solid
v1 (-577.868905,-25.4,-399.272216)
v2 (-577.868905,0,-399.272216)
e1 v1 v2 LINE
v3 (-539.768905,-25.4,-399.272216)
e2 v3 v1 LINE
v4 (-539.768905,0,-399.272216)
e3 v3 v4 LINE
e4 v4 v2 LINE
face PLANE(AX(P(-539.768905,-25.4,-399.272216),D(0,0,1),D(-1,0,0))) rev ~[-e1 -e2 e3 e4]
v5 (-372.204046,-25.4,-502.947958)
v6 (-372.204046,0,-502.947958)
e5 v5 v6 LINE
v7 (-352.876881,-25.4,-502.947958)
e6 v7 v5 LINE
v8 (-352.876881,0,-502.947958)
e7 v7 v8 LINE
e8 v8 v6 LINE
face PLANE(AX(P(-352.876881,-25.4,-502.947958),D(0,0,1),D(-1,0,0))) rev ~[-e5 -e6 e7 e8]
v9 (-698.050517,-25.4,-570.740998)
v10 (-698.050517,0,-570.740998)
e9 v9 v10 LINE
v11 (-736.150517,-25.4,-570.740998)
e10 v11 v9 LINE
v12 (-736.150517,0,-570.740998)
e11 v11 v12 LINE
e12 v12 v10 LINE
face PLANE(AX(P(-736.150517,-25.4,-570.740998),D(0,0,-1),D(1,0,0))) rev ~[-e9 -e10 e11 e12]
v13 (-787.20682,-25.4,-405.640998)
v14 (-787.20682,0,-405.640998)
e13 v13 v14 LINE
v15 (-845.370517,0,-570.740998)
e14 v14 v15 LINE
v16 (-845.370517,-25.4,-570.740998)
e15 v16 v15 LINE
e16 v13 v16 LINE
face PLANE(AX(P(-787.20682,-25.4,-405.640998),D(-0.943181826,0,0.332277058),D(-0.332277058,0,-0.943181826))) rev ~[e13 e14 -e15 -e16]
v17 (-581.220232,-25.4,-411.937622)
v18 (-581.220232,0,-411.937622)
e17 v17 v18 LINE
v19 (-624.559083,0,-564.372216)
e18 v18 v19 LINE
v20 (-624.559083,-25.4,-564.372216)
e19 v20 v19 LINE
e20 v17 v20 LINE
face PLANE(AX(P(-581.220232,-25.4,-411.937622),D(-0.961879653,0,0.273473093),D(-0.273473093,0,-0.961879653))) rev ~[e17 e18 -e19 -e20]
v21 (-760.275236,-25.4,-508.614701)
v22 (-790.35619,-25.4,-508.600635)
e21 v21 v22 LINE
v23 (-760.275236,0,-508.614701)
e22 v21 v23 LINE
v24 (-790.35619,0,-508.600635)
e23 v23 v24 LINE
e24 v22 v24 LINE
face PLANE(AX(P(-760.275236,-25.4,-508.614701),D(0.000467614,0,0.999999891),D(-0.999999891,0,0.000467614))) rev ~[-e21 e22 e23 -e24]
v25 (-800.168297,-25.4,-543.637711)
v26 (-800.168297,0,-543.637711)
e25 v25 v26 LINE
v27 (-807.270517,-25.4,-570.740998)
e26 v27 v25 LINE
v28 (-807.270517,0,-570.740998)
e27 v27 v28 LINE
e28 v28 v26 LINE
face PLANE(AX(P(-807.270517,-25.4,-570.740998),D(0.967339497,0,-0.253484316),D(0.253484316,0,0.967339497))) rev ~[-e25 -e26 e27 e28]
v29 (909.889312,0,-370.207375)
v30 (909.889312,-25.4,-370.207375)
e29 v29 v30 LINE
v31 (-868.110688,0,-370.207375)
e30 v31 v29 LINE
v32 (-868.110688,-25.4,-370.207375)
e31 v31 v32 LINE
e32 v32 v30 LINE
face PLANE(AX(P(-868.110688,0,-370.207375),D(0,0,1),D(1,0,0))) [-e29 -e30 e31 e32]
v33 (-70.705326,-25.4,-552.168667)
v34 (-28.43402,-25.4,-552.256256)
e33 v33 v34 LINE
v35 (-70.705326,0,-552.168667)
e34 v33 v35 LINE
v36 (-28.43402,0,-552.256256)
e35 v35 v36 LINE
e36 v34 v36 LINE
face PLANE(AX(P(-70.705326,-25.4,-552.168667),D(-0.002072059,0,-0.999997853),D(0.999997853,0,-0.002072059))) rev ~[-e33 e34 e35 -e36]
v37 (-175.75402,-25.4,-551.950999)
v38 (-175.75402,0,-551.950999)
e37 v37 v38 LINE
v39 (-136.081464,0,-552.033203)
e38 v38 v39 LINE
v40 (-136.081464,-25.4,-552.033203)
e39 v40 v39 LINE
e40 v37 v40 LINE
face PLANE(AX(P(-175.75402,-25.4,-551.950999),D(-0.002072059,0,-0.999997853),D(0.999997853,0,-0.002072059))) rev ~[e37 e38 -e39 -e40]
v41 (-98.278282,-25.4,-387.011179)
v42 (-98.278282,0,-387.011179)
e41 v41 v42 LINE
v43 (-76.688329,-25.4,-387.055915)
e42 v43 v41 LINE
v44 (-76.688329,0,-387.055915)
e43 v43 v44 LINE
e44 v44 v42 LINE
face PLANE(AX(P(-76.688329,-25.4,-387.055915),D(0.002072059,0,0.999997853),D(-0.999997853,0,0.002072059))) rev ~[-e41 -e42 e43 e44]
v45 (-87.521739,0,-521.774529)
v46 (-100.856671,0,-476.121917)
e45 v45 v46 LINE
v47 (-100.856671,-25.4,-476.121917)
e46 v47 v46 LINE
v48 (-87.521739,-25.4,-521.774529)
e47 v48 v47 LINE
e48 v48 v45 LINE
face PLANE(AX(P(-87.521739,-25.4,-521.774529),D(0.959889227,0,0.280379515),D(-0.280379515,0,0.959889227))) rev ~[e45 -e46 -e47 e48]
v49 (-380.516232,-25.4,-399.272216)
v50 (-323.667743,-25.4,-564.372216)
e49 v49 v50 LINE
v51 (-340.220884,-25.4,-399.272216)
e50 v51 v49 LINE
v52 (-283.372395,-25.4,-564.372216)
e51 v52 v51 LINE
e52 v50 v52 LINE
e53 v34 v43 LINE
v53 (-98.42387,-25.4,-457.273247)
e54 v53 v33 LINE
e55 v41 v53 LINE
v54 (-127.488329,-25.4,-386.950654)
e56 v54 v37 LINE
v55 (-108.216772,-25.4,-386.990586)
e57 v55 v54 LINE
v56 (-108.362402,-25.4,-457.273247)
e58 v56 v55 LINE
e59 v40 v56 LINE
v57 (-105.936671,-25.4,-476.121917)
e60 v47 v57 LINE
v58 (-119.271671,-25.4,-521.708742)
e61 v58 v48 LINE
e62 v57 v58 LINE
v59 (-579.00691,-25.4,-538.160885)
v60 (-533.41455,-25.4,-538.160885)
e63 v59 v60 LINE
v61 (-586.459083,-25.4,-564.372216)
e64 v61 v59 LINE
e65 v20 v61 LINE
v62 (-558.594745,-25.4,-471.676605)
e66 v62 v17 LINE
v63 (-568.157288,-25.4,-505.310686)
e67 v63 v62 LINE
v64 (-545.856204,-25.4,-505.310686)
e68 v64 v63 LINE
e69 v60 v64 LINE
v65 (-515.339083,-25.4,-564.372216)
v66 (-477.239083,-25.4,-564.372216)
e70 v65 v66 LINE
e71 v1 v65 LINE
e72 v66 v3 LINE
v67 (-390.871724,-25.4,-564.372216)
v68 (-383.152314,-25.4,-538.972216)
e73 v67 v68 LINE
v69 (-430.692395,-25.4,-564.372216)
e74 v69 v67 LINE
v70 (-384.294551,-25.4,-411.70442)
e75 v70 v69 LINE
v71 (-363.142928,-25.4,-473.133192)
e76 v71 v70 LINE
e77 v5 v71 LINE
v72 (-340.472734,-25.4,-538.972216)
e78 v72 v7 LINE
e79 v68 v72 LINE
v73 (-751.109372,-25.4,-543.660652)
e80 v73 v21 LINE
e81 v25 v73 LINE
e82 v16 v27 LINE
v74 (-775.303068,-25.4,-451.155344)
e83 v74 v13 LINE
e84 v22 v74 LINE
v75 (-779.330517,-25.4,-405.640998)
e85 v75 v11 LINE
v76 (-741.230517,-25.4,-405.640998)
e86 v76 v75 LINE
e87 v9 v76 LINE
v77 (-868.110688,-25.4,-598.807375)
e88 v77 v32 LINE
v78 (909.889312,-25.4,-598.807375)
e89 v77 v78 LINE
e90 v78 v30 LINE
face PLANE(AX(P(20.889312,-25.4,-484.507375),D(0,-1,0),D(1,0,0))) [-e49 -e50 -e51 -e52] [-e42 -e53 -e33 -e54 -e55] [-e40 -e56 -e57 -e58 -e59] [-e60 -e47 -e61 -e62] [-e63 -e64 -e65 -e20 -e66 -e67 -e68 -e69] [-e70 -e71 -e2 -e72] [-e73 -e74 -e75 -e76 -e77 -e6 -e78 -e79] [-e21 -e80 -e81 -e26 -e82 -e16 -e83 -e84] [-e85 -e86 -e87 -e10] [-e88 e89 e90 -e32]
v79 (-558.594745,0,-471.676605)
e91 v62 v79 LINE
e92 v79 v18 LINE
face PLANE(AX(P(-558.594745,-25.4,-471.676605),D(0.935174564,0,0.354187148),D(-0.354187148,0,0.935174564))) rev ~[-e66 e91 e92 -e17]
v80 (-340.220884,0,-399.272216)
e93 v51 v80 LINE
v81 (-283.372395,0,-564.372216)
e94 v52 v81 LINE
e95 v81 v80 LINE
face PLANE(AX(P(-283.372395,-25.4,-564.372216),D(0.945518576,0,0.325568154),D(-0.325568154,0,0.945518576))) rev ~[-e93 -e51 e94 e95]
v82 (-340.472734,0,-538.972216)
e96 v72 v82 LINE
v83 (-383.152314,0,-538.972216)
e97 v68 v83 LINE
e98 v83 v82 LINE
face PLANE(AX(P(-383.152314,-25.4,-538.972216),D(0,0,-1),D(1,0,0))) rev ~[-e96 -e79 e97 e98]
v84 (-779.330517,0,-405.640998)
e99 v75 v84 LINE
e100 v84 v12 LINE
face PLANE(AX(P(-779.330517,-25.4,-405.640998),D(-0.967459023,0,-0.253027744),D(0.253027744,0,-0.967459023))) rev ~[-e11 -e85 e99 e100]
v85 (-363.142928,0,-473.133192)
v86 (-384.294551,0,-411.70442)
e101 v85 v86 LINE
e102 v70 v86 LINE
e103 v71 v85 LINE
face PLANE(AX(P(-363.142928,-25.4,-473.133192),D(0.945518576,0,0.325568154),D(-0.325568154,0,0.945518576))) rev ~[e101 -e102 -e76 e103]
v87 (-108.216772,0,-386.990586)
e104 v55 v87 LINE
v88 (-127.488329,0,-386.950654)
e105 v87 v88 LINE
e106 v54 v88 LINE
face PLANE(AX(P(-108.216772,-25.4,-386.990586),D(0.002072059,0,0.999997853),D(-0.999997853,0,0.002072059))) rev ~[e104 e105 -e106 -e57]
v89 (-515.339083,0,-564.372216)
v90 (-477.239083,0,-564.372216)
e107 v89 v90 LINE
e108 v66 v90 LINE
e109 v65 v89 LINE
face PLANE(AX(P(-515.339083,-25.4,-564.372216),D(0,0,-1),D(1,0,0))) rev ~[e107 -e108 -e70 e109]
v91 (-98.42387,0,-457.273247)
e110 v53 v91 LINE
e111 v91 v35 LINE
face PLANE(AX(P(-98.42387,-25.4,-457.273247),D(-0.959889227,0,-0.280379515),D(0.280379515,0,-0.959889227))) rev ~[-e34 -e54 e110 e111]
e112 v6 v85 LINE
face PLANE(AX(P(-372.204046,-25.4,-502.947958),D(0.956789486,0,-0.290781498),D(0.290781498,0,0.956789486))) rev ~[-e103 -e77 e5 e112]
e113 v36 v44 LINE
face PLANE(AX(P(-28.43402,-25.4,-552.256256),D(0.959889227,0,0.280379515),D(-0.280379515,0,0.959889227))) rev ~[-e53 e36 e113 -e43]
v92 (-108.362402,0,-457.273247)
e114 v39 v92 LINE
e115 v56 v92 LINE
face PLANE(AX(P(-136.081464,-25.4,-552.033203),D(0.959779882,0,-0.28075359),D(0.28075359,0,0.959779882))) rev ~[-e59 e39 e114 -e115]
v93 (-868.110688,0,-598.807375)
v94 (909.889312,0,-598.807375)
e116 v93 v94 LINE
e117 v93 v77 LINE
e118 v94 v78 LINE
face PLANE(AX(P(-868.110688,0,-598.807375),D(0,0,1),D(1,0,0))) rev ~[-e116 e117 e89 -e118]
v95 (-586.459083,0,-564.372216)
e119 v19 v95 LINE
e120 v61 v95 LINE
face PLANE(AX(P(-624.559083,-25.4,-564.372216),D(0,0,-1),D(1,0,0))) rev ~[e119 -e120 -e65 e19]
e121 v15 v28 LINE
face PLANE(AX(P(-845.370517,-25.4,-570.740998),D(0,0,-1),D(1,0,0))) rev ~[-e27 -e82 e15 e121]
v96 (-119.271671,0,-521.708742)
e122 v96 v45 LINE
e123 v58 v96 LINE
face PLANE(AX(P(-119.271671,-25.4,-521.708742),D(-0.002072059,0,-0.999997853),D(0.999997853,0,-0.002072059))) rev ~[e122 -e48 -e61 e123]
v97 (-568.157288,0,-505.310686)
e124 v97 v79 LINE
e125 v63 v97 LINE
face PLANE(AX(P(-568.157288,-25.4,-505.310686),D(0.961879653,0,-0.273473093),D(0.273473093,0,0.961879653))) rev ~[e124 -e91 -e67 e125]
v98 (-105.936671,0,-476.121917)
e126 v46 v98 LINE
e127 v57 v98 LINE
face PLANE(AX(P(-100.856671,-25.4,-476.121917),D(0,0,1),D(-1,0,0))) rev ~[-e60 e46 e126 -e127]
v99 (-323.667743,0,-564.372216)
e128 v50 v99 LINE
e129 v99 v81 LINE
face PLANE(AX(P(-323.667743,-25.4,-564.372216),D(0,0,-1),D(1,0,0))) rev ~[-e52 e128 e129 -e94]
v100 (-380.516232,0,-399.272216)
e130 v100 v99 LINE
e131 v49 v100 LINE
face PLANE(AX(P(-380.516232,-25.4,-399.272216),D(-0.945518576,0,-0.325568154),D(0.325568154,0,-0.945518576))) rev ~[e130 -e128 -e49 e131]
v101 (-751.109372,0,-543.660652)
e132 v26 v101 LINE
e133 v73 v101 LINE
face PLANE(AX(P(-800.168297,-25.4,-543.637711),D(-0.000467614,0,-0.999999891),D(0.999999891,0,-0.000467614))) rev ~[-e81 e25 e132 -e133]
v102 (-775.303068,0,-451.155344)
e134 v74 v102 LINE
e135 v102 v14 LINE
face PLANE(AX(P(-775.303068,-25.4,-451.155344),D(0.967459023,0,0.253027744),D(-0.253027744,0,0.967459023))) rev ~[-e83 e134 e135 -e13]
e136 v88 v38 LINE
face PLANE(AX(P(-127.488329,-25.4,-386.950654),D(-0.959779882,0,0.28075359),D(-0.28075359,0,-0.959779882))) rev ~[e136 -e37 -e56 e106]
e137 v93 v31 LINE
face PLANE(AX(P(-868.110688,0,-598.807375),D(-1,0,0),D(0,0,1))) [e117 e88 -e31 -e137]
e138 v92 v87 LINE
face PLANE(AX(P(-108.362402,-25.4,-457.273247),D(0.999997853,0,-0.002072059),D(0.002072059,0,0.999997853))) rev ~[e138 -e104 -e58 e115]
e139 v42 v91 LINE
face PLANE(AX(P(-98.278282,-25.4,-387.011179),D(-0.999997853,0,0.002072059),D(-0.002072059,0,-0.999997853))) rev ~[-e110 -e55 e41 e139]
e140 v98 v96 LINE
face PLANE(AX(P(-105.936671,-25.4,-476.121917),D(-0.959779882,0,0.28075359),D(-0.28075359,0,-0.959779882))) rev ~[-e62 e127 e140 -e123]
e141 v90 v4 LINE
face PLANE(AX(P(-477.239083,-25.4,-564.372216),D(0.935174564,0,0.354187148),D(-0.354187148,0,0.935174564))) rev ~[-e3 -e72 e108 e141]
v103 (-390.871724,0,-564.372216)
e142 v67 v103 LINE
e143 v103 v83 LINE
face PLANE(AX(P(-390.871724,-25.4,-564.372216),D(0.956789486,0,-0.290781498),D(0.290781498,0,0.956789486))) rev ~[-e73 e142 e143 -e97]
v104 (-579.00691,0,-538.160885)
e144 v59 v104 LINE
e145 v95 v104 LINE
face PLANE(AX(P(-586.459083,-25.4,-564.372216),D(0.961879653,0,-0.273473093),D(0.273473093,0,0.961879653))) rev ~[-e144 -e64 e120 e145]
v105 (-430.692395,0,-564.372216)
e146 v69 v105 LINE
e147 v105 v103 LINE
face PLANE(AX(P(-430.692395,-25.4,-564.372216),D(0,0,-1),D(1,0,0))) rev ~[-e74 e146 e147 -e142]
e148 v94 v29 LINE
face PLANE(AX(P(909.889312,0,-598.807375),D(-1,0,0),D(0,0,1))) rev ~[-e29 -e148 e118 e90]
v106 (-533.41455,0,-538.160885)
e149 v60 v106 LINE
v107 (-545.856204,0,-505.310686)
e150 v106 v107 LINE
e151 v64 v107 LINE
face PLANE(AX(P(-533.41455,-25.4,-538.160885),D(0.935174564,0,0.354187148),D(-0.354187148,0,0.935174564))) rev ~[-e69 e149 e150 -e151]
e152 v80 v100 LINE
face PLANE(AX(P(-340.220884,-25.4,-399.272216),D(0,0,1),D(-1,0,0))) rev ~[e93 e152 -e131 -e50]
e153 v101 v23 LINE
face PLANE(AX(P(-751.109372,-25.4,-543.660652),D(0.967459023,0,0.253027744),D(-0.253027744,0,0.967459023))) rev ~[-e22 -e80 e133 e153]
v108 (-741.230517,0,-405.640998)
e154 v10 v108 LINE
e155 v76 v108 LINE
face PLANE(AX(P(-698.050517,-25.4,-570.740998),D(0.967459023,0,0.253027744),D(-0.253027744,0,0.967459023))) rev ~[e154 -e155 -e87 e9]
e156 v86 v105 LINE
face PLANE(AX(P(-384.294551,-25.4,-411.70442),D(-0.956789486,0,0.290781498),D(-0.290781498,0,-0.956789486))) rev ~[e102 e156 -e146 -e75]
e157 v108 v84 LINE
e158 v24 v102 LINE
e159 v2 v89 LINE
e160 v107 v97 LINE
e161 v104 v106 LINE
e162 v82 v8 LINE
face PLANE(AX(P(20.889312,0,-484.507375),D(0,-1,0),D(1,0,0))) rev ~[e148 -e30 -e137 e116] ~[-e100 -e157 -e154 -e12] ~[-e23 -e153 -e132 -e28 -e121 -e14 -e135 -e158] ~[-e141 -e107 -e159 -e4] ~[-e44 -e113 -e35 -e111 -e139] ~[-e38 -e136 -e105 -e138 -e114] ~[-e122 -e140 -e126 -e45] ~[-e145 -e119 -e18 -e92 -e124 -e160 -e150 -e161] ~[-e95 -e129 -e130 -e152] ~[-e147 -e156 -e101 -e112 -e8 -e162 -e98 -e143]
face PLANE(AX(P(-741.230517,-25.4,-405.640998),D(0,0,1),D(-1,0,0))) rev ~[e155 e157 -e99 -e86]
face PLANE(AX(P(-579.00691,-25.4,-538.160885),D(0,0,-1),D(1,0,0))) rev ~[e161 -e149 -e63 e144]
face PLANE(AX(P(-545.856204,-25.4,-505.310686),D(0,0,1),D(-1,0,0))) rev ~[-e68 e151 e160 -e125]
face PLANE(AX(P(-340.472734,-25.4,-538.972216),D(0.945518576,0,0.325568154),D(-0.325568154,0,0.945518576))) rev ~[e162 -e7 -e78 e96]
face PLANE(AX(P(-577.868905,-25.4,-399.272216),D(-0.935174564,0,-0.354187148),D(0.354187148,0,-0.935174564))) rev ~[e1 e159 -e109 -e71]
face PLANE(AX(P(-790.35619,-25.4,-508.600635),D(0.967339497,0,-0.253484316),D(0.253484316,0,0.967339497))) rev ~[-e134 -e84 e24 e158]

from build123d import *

# Parameters (mm, degrees)
F0_W     = 1778
F0_H     = 228.6
F1_DEPTH = 25.4
F3_DEPTH = 25.4
F5_DEPTH = 25.4
F7_DEPTH = 25.4
F9_DEPTH = 25.4


# Not quite as in the source:
# - a feature names something its author has since deleted; it is built from what else it names


with BuildPart() as f1:
    # F0 (on Front) → F1 (new body)
    with BuildSketch(Plane.XZ):
        with Locations((20.8893120289, -484.507374977)):
            Rectangle(F0_W, F0_H)
    extrude(amount=F1_DEPTH)

    # F2 (on face) → F3 (cut)
    with BuildSketch(Plane.XZ.offset(25.4)):
        Polygon((-787.2068197411, -405.6409977913), (-845.3705171574, -570.7409977913), (-807.2705171574, -570.7409977913), (-800.1682969996, -543.6377111227), (-751.1093717848, -543.6606517417), (-760.2752358596, -508.6147008675), (-790.3561904598, -508.6006346051), (-775.3030676873, -451.1553438794), align=None)
        Polygon((-779.3305171574, -405.6409977913), (-736.1505171574, -570.7409977913), (-698.0505171574, -570.7409977913), (-741.2305171574, -405.6409977913), align=None)
    extrude(amount=-F3_DEPTH, mode=Mode.SUBTRACT)

    # F4 (on face) → F5 (cut)
    with BuildSketch(Plane.XZ.offset(25.4)):
        Polygon((-577.868904515, -399.2722157273), (-515.3390834819, -564.3722157273), (-477.2390834819, -564.3722157273), (-539.768904515, -399.2722157273), align=None)
        Polygon((-581.2202315634, -411.9376221896), (-624.5590834819, -564.3722157273), (-586.4590834819, -564.3722157273), (-579.0069102806, -538.1608847247), (-533.414550058, -538.1608847247), (-545.856203928, -505.3106858916), (-568.1572882119, -505.3106858916), (-558.5947445746, -471.6766049683), align=None)
    extrude(amount=-F5_DEPTH, mode=Mode.SUBTRACT)

    # F6 (on face) → F7 (cut)
    with BuildSketch(Plane.XZ.offset(25.4)):
        Polygon((-384.2945505557, -411.7044204948), (-430.6923954532, -564.3722157273), (-390.8717237614, -564.3722157273), (-383.1523140548, -538.9722157273), (-372.2040461495, -502.9479579969), (-363.142928275, -473.133192003), align=None)
        Polygon((-372.2040461495, -502.9479579969), (-383.1523140548, -538.9722157273), (-340.4727343746, -538.9722157273), (-352.8768810595, -502.9479579969), align=None)
        Polygon((-340.2208844074, -399.2722157273), (-380.5162323606, -399.2722157273), (-323.6677434064, -564.3722157273), (-283.3723954532, -564.3722157273), align=None)
    extrude(amount=-F7_DEPTH, mode=Mode.SUBTRACT)

    # F8 (on face) → F9 (cut)
    with BuildSketch(Plane.XZ.offset(25.4)):
        Polygon((-108.2167720242, -386.9905862627), (-127.4883288311, -386.9506543679), (-175.7540198106, -551.9509992015), (-136.0814640163, -552.0332032675), (-108.3624021802, -457.2732471037), align=None)
        Polygon((-105.9366706351, -476.1219167204), (-119.2716706351, -521.7087415168), (-87.5217387934, -521.7745294006), (-100.8566706351, -476.1219167204), align=None)
        Polygon((-28.4340198106, -552.2562556378), (-76.6883288311, -387.055915208), (-98.2782824835, -387.011179447), (-98.4238699691, -457.2732471037), (-70.7053259606, -552.1686667953), align=None)
    extrude(amount=-F9_DEPTH, mode=Mode.SUBTRACT)


solid = f1.part
